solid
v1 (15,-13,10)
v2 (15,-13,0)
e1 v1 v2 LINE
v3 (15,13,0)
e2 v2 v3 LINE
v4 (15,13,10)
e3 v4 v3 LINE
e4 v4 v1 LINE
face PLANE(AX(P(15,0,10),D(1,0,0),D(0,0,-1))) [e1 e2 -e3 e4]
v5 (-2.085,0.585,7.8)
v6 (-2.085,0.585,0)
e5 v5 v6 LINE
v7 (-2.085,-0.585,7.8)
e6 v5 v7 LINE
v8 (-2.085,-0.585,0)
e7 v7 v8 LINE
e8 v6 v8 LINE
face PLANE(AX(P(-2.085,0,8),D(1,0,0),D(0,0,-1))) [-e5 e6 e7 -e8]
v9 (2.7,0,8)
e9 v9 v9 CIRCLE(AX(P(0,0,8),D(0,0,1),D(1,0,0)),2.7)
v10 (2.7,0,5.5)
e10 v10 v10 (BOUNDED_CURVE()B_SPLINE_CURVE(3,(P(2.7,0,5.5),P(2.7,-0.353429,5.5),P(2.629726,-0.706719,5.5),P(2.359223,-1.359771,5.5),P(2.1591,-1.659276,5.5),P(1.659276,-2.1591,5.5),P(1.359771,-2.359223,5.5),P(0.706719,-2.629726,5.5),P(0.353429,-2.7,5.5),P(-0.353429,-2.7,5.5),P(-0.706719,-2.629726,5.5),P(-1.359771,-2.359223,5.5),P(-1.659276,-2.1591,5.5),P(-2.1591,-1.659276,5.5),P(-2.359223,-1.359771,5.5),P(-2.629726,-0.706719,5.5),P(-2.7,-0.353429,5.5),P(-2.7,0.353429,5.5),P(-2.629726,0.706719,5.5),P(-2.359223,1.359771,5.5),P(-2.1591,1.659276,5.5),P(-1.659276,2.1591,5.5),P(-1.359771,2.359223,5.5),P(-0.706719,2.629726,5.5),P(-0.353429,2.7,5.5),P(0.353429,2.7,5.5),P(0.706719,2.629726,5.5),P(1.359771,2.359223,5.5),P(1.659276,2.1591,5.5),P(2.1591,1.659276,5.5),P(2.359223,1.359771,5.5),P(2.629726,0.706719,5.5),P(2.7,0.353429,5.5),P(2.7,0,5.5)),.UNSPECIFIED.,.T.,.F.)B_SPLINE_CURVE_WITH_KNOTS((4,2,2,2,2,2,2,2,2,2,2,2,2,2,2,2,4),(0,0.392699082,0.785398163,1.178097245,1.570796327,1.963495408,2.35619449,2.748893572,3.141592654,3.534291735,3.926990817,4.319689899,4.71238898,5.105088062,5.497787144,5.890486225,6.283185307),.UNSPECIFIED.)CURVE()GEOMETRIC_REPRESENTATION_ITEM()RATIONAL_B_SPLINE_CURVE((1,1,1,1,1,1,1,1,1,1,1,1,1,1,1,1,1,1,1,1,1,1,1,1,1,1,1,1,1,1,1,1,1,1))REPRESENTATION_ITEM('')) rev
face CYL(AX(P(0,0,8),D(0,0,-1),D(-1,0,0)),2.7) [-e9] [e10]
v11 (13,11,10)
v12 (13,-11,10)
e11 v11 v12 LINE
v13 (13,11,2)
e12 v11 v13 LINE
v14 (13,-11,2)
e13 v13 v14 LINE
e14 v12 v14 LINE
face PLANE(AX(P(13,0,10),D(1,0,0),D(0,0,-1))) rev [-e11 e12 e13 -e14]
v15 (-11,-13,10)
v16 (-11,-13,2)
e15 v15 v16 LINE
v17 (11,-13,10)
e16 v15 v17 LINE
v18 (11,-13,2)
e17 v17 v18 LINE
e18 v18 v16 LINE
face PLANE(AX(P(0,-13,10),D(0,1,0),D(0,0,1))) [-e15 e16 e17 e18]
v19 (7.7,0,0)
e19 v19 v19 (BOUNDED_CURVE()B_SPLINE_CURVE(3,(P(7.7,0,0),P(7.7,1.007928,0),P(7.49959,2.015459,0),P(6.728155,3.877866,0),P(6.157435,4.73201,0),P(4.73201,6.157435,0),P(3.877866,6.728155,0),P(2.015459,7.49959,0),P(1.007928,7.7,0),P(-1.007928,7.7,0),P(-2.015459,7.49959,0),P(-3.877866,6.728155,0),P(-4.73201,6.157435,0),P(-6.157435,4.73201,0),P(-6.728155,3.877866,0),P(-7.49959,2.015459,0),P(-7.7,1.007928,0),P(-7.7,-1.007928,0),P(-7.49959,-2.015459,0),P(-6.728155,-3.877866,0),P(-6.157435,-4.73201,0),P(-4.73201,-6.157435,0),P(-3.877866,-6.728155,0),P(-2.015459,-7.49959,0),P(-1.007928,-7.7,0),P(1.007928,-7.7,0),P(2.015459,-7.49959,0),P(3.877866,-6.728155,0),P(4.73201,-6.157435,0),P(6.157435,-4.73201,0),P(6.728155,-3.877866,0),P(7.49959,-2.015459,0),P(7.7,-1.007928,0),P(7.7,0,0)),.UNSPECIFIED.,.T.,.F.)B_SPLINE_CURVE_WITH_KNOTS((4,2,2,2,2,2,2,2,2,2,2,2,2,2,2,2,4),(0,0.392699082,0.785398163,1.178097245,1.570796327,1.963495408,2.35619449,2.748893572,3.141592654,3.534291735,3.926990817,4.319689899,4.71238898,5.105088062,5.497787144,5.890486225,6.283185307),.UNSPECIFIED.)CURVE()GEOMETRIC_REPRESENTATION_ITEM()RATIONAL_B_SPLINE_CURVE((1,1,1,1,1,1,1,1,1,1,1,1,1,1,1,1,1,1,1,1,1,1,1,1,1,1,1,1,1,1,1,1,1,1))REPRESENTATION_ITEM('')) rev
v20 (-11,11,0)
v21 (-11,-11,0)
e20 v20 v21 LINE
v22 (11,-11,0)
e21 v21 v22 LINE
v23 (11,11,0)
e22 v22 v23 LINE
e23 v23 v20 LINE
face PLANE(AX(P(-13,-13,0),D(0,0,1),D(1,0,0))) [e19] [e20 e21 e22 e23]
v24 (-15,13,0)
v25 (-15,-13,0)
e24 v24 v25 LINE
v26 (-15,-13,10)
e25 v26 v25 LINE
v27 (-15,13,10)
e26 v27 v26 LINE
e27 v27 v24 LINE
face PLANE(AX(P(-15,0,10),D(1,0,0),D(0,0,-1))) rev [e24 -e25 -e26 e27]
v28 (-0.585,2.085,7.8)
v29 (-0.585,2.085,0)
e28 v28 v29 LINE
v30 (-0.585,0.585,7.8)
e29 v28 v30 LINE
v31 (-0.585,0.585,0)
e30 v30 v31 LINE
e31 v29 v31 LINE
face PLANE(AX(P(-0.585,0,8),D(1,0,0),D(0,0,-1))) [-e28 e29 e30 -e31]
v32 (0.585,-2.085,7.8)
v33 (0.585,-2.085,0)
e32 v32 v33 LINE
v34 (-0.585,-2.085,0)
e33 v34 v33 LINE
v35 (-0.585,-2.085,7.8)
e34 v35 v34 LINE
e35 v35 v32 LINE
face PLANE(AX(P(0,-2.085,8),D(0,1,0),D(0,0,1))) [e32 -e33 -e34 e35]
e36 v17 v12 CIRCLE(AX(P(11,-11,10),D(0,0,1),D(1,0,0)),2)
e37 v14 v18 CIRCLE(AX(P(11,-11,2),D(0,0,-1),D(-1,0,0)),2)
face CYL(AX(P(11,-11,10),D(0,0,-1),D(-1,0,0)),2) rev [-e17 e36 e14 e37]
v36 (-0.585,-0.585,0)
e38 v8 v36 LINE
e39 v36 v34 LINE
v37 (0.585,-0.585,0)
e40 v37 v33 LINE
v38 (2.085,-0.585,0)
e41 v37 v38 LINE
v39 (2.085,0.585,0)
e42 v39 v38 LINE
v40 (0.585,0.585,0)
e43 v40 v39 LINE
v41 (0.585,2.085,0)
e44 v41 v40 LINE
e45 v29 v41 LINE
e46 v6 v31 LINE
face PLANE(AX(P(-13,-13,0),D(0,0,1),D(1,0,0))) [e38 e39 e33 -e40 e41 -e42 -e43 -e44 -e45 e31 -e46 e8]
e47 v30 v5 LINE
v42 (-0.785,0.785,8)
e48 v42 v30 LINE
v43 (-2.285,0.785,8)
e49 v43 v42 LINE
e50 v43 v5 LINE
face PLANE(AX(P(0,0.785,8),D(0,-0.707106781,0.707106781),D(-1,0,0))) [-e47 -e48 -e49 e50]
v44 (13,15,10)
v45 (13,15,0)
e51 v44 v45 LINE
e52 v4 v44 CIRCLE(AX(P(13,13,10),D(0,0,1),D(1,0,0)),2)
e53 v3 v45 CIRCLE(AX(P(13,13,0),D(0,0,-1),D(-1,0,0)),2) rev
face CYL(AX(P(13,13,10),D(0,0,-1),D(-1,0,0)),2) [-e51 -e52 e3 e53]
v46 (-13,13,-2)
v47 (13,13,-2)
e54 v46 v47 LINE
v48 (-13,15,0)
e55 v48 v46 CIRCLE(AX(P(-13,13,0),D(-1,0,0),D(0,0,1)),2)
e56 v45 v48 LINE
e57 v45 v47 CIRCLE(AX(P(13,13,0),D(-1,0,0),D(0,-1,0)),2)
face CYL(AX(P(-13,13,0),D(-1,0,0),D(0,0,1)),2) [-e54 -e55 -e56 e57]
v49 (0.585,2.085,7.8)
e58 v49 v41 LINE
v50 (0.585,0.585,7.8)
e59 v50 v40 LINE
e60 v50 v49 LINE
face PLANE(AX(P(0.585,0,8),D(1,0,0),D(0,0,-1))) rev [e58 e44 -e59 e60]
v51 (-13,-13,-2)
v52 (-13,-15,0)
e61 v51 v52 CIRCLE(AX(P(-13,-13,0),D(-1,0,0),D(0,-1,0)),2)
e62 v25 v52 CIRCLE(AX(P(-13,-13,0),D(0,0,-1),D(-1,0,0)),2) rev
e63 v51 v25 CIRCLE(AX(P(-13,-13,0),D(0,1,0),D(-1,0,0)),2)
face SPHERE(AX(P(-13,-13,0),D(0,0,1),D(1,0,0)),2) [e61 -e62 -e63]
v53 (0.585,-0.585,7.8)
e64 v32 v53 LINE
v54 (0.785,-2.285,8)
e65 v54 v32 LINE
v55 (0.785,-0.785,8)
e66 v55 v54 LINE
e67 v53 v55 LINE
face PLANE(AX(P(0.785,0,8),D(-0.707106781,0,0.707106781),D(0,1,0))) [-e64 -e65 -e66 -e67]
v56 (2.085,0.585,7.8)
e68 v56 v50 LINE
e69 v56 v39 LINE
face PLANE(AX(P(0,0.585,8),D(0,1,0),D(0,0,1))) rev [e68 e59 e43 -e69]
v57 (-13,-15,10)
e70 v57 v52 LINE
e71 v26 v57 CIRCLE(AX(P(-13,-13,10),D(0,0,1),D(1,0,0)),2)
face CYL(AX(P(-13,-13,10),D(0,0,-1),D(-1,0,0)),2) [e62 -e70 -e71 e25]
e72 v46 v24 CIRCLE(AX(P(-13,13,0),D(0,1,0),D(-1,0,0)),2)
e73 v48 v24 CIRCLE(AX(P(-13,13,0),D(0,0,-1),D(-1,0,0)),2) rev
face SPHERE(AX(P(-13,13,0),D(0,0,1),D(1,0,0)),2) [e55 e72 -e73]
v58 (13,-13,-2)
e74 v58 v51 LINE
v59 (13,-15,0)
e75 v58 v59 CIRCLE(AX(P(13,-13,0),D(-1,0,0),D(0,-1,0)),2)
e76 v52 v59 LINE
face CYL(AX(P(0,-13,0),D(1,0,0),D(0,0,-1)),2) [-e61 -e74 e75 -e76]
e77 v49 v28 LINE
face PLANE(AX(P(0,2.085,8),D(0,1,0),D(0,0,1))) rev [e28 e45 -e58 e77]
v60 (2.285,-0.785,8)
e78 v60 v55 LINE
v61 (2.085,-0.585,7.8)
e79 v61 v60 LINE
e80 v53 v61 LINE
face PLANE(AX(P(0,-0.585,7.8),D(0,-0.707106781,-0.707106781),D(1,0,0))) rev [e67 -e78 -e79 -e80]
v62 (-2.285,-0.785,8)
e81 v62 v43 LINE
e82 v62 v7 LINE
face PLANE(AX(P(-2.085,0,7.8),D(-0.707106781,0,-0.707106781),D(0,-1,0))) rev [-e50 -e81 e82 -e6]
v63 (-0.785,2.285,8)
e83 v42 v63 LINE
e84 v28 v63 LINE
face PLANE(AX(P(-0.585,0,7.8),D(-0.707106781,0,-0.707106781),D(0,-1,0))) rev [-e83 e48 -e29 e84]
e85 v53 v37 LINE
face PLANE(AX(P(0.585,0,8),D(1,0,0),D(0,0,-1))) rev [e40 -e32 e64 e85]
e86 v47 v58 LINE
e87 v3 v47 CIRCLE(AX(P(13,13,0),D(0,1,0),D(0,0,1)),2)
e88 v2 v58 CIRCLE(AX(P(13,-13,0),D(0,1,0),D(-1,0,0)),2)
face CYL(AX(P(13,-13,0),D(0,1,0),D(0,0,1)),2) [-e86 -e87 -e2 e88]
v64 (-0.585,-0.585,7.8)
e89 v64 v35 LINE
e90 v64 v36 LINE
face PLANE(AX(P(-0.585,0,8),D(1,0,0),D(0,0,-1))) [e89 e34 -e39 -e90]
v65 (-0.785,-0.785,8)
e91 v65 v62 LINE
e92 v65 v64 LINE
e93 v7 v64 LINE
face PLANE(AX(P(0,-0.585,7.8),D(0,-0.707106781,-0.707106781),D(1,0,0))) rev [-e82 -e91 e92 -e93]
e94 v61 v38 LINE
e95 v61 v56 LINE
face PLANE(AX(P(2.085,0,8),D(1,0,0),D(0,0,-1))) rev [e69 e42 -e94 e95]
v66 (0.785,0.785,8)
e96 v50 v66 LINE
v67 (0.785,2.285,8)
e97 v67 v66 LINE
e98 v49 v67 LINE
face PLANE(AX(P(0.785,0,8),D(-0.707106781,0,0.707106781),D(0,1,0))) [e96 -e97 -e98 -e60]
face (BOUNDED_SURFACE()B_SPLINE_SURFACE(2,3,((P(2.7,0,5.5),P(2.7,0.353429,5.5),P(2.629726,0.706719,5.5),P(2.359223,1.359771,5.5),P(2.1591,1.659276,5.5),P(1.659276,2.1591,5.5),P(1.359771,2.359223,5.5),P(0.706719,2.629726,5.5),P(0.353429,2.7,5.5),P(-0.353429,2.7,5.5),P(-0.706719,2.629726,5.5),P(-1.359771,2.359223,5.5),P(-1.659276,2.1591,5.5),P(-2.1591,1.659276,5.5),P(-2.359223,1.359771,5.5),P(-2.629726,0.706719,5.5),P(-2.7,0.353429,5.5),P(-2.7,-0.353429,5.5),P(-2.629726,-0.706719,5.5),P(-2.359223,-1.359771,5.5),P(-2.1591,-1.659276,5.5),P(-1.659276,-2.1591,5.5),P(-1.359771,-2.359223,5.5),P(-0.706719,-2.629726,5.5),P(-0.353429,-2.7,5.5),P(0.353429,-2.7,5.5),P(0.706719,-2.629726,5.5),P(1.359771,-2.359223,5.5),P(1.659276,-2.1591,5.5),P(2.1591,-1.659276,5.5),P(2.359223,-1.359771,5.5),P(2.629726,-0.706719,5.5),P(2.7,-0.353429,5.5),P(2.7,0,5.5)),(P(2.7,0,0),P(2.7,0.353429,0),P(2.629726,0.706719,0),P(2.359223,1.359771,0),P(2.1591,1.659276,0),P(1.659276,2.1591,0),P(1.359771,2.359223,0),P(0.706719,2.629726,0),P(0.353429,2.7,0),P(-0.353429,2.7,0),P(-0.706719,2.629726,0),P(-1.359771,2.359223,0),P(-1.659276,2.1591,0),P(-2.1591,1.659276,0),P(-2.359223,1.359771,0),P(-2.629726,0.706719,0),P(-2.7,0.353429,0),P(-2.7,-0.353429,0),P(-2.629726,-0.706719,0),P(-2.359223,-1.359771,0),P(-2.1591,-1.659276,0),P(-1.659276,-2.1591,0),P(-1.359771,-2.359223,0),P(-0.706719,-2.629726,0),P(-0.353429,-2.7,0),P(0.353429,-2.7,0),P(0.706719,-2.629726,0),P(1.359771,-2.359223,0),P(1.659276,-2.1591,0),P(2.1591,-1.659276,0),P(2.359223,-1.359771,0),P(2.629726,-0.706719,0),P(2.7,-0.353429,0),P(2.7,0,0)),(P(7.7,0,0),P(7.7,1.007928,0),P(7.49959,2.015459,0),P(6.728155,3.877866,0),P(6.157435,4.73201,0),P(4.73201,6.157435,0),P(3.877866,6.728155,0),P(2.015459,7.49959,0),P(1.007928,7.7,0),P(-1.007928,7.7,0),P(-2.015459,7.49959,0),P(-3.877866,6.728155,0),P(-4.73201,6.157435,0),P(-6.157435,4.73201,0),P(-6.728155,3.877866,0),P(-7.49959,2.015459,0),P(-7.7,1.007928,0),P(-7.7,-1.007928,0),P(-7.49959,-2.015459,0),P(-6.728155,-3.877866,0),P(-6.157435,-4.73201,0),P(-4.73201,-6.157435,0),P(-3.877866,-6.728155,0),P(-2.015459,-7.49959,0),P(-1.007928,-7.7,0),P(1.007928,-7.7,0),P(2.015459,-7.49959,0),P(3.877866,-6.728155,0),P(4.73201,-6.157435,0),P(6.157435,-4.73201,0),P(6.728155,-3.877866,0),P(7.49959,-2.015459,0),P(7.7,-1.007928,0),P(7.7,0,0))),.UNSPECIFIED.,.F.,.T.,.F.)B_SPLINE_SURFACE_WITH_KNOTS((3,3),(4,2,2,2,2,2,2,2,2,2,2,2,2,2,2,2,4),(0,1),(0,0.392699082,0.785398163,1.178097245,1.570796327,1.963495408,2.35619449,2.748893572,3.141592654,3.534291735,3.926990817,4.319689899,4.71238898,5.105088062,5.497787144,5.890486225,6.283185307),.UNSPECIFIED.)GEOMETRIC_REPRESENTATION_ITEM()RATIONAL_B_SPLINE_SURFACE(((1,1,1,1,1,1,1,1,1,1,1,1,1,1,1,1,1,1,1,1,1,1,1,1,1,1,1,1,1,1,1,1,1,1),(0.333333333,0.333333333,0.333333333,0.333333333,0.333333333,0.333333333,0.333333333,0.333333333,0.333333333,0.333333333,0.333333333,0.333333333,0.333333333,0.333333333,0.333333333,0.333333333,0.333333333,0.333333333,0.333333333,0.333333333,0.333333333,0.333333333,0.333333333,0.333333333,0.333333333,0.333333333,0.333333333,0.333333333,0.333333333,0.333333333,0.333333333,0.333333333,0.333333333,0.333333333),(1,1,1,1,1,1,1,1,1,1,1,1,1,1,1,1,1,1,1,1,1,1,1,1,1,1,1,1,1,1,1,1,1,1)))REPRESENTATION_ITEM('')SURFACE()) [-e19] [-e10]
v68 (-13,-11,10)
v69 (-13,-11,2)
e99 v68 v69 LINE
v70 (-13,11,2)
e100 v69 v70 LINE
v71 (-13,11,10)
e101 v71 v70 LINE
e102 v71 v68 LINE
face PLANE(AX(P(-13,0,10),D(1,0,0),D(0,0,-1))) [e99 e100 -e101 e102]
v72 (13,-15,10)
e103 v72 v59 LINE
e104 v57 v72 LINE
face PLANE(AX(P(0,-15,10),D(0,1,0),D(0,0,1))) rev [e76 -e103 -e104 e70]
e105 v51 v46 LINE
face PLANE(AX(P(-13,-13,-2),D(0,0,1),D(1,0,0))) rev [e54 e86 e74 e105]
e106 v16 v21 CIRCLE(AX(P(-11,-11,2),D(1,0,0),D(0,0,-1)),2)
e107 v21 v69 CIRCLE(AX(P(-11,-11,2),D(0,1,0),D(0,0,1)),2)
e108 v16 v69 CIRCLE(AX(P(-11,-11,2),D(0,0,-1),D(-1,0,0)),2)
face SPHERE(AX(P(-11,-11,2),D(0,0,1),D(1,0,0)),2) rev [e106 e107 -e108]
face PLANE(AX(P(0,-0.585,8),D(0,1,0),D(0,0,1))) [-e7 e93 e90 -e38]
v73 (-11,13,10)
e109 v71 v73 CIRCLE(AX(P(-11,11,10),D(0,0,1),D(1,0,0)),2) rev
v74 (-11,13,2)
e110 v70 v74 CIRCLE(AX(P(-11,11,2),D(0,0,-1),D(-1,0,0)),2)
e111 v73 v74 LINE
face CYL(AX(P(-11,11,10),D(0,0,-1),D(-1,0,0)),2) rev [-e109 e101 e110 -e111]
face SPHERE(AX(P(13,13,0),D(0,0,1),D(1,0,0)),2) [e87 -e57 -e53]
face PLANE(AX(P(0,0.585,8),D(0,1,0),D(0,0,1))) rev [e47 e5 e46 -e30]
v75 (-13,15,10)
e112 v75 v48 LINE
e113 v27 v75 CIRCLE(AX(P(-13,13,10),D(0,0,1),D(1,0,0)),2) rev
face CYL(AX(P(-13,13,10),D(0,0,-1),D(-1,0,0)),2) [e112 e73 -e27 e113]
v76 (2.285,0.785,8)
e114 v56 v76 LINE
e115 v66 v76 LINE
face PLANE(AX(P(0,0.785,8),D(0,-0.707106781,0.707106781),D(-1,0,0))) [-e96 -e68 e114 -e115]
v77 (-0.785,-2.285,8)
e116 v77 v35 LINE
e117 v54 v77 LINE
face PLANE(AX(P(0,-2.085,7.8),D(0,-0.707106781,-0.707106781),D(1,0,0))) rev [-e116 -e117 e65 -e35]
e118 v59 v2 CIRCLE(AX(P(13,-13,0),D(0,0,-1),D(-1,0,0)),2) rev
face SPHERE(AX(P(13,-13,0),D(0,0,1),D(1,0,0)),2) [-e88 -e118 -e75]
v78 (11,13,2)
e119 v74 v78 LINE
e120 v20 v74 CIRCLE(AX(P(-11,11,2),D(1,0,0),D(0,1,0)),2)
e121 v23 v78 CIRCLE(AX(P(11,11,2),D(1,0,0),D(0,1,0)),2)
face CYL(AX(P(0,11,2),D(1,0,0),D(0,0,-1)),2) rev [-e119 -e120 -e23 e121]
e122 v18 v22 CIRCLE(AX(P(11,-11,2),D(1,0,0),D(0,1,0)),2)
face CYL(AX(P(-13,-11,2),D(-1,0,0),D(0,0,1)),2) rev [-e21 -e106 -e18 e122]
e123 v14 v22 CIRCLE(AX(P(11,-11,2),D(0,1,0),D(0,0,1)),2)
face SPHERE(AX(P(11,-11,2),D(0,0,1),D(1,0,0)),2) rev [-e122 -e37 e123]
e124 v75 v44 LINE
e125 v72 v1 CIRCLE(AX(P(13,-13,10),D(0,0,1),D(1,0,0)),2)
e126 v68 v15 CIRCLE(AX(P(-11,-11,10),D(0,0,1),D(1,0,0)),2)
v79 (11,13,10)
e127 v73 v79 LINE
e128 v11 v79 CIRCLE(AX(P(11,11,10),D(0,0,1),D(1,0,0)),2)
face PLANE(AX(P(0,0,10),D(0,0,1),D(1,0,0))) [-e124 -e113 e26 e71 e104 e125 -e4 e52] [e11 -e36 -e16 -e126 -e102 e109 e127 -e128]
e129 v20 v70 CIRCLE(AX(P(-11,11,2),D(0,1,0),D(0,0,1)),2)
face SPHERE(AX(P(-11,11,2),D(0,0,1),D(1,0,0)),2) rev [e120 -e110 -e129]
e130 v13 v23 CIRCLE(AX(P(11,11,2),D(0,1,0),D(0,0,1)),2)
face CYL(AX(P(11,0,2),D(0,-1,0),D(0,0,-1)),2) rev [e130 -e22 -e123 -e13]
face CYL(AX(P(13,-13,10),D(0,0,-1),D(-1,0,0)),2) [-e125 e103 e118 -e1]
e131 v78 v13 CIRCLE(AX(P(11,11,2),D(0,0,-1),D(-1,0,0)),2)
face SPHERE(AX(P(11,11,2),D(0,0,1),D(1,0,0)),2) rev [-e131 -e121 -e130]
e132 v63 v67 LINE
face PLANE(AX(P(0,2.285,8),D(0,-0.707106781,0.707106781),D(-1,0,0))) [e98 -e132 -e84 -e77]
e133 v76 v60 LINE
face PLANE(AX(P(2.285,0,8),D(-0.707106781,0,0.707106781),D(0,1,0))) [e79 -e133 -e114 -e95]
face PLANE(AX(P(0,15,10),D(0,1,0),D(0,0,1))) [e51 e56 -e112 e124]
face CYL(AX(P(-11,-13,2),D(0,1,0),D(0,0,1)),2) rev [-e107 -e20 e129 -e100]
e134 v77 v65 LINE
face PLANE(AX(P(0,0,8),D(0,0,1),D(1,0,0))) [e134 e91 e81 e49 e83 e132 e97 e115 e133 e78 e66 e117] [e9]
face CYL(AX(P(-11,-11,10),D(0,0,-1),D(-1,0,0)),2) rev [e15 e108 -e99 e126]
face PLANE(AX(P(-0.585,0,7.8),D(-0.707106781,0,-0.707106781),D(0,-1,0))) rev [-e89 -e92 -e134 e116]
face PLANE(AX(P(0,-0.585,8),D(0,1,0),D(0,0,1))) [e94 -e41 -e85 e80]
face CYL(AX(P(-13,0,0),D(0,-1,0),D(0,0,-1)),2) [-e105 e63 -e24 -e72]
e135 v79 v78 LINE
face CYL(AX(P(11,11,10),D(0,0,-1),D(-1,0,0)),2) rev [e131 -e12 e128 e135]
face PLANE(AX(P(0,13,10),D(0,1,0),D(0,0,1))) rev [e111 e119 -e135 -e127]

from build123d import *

# Parameters (mm, degrees)
EXTRUDE_1_DEPTH = 10
SKETCH_1_6_R    = 2.7
EXTRUDE_2_DEPTH = 8
EXTRUDE_START   = -2
EXTRUDE_3_DEPTH = 2
FILLET_1_R      = 2
CHAMFER_1_SIZE  = 0.2
FILLET_2_R      = 2
FILLET_3_SIZE   = 5
FILLET_3_SIZE_2 = 5.5


with BuildPart() as part:
    # 草图1 → 凸台-拉伸1 (new body)
    with BuildSketch(Plane.XY):
        with BuildLine():
            ThreePointArc((-15, 13), (-14.414213562, 14.414213562), (-13, 15))
            Line((-13, 15), (13, 15))
            ThreePointArc((13, 15), (14.414213562, 14.414213562), (15, 13))
            Line((15, 13), (15, -13))
            ThreePointArc((15, -13), (14.414213562, -14.414213562), (13, -15))
            Line((13, -15), (-13, -15))
            ThreePointArc((-13, -15), (-14.414213562, -14.414213562), (-15, -13))
            Line((-15, -13), (-15, 13))
        make_face()
        with BuildLine():
            ThreePointArc((-13, -11), (-12.414213562, -12.414213562), (-11, -13))
            Line((-11, -13), (11, -13))
            ThreePointArc((11, -13), (12.414213562, -12.414213562), (13, -11))
            Line((13, -11), (13, 11))
            ThreePointArc((13, 11), (12.414213562, 12.414213562), (11, 13))
            Line((11, 13), (-11, 13))
            ThreePointArc((-11, 13), (-12.414213562, 12.414213562), (-13, 11))
            Line((-13, 11), (-13, -11))
        make_face(mode=Mode.SUBTRACT)
    extrude(amount=EXTRUDE_1_DEPTH)



with BuildPart() as body_2:
    # 草图1<6> → 凸台-拉伸2 (new body)
    with BuildSketch(Plane.XY):
        Circle(SKETCH_1_6_R)
        Polygon((-2.085, -0.585), (-2.085, 0.585), (-0.585, 0.585), (-0.585, 2.085), (0.585, 2.085), (0.585, 0.585), (2.085, 0.585), (2.085, -0.585), (0.585, -0.585), (0.585, -2.085), (-0.585, -2.085), (-0.585, -0.585), align=None, mode=Mode.SUBTRACT)
    extrude(amount=EXTRUDE_2_DEPTH)


with BuildPart() as part_1:
    add(part.part)

    add(body_2.part)  # 凸台-拉伸3 merges body 2
    # 草图1<7> → 凸台-拉伸3 (add)
    with BuildSketch(Plane.XY.offset(EXTRUDE_START)):
        with BuildLine():
            Line((-13, 15), (13, 15))
            ThreePointArc((13, 15), (14.414213562, 14.414213562), (15, 13))
            Line((15, 13), (15, -13))
            ThreePointArc((15, -13), (14.414213562, -14.414213562), (13, -15))
            Line((13, -15), (-13, -15))
            ThreePointArc((-13, -15), (-14.414213562, -14.414213562), (-15, -13))
            Line((-15, -13), (-15, 13))
            ThreePointArc((-15, 13), (-14.414213562, 14.414213562), (-13, 15))
        make_face()
    extrude(amount=EXTRUDE_3_DEPTH)

    # 圆角1
    fillet_1_edges = [part_1.edges().sort_by_distance(p)[0] for p in [
        (-14.414213562, -14.414213562, -2),
        (-15, 0, -2),
        (14.414213562, 14.414213562, -2),
        (14.414213562, -14.414213562, -2),
        (0, -15, -2),
        (-14.414213562, 14.414213562, -2),
        (0, 15, -2),
        (15, 0, -2),
    ]]
    fillet(fillet_1_edges, radius=FILLET_1_R)

    # 倒角1
    chamfer_1_edges = [part_1.edges().sort_by_distance(p)[0] for p in [
        (1.335, -0.585, 8),
        (0, -2.085, 8),
        (-0.585, -1.335, 8),
        (-1.335, -0.585, 8),
        (-2.085, 0, 8),
        (-0.585, 1.335, 8),
        (0, 2.085, 8),
        (0.585, 1.335, 8),
        (1.335, 0.585, 8),
        (2.085, 0, 8),
        (0.585, -1.335, 8),
        (-1.335, 0.585, 8),
    ]]
    chamfer(chamfer_1_edges, length=CHAMFER_1_SIZE)

    # 圆角2
    fillet_2_edges = [part_1.edges().sort_by_distance(p)[0] for p in [
        (0, -13, 0),
        (12.414213562, -12.414213562, 0),
        (13, 0, 0),
        (12.414213562, 12.414213562, 0),
        (0, 13, 0),
        (-12.414213562, 12.414213562, 0),
        (-13, 0, 0),
        (-12.414213562, -12.414213562, 0),
    ]]
    fillet(fillet_2_edges, radius=FILLET_2_R)

    # 圆角3
    # a fillet whose section is not a circle: 5.5, 5 mm, written as the material it adds along each edge
    with BuildSketch(Plane(origin=(0, 0, 0), x_dir=(1, 0, 0), z_dir=(0, -1, 0))) as fillet_3_piece_1:
        with BuildLine():
            Bezier((2.7 + FILLET_3_SIZE, 0), (2.7, 0), (2.7, FILLET_3_SIZE_2), weights=[1, 0.333333333, 1])
            Line((2.7, FILLET_3_SIZE_2), (2.7, 0))
            Line((2.7, 0), (2.7 + FILLET_3_SIZE, 0))
        make_face()
    revolve(axis=Axis((0, 0, 0), (0, 0, 1)))


solid = part_1.part
